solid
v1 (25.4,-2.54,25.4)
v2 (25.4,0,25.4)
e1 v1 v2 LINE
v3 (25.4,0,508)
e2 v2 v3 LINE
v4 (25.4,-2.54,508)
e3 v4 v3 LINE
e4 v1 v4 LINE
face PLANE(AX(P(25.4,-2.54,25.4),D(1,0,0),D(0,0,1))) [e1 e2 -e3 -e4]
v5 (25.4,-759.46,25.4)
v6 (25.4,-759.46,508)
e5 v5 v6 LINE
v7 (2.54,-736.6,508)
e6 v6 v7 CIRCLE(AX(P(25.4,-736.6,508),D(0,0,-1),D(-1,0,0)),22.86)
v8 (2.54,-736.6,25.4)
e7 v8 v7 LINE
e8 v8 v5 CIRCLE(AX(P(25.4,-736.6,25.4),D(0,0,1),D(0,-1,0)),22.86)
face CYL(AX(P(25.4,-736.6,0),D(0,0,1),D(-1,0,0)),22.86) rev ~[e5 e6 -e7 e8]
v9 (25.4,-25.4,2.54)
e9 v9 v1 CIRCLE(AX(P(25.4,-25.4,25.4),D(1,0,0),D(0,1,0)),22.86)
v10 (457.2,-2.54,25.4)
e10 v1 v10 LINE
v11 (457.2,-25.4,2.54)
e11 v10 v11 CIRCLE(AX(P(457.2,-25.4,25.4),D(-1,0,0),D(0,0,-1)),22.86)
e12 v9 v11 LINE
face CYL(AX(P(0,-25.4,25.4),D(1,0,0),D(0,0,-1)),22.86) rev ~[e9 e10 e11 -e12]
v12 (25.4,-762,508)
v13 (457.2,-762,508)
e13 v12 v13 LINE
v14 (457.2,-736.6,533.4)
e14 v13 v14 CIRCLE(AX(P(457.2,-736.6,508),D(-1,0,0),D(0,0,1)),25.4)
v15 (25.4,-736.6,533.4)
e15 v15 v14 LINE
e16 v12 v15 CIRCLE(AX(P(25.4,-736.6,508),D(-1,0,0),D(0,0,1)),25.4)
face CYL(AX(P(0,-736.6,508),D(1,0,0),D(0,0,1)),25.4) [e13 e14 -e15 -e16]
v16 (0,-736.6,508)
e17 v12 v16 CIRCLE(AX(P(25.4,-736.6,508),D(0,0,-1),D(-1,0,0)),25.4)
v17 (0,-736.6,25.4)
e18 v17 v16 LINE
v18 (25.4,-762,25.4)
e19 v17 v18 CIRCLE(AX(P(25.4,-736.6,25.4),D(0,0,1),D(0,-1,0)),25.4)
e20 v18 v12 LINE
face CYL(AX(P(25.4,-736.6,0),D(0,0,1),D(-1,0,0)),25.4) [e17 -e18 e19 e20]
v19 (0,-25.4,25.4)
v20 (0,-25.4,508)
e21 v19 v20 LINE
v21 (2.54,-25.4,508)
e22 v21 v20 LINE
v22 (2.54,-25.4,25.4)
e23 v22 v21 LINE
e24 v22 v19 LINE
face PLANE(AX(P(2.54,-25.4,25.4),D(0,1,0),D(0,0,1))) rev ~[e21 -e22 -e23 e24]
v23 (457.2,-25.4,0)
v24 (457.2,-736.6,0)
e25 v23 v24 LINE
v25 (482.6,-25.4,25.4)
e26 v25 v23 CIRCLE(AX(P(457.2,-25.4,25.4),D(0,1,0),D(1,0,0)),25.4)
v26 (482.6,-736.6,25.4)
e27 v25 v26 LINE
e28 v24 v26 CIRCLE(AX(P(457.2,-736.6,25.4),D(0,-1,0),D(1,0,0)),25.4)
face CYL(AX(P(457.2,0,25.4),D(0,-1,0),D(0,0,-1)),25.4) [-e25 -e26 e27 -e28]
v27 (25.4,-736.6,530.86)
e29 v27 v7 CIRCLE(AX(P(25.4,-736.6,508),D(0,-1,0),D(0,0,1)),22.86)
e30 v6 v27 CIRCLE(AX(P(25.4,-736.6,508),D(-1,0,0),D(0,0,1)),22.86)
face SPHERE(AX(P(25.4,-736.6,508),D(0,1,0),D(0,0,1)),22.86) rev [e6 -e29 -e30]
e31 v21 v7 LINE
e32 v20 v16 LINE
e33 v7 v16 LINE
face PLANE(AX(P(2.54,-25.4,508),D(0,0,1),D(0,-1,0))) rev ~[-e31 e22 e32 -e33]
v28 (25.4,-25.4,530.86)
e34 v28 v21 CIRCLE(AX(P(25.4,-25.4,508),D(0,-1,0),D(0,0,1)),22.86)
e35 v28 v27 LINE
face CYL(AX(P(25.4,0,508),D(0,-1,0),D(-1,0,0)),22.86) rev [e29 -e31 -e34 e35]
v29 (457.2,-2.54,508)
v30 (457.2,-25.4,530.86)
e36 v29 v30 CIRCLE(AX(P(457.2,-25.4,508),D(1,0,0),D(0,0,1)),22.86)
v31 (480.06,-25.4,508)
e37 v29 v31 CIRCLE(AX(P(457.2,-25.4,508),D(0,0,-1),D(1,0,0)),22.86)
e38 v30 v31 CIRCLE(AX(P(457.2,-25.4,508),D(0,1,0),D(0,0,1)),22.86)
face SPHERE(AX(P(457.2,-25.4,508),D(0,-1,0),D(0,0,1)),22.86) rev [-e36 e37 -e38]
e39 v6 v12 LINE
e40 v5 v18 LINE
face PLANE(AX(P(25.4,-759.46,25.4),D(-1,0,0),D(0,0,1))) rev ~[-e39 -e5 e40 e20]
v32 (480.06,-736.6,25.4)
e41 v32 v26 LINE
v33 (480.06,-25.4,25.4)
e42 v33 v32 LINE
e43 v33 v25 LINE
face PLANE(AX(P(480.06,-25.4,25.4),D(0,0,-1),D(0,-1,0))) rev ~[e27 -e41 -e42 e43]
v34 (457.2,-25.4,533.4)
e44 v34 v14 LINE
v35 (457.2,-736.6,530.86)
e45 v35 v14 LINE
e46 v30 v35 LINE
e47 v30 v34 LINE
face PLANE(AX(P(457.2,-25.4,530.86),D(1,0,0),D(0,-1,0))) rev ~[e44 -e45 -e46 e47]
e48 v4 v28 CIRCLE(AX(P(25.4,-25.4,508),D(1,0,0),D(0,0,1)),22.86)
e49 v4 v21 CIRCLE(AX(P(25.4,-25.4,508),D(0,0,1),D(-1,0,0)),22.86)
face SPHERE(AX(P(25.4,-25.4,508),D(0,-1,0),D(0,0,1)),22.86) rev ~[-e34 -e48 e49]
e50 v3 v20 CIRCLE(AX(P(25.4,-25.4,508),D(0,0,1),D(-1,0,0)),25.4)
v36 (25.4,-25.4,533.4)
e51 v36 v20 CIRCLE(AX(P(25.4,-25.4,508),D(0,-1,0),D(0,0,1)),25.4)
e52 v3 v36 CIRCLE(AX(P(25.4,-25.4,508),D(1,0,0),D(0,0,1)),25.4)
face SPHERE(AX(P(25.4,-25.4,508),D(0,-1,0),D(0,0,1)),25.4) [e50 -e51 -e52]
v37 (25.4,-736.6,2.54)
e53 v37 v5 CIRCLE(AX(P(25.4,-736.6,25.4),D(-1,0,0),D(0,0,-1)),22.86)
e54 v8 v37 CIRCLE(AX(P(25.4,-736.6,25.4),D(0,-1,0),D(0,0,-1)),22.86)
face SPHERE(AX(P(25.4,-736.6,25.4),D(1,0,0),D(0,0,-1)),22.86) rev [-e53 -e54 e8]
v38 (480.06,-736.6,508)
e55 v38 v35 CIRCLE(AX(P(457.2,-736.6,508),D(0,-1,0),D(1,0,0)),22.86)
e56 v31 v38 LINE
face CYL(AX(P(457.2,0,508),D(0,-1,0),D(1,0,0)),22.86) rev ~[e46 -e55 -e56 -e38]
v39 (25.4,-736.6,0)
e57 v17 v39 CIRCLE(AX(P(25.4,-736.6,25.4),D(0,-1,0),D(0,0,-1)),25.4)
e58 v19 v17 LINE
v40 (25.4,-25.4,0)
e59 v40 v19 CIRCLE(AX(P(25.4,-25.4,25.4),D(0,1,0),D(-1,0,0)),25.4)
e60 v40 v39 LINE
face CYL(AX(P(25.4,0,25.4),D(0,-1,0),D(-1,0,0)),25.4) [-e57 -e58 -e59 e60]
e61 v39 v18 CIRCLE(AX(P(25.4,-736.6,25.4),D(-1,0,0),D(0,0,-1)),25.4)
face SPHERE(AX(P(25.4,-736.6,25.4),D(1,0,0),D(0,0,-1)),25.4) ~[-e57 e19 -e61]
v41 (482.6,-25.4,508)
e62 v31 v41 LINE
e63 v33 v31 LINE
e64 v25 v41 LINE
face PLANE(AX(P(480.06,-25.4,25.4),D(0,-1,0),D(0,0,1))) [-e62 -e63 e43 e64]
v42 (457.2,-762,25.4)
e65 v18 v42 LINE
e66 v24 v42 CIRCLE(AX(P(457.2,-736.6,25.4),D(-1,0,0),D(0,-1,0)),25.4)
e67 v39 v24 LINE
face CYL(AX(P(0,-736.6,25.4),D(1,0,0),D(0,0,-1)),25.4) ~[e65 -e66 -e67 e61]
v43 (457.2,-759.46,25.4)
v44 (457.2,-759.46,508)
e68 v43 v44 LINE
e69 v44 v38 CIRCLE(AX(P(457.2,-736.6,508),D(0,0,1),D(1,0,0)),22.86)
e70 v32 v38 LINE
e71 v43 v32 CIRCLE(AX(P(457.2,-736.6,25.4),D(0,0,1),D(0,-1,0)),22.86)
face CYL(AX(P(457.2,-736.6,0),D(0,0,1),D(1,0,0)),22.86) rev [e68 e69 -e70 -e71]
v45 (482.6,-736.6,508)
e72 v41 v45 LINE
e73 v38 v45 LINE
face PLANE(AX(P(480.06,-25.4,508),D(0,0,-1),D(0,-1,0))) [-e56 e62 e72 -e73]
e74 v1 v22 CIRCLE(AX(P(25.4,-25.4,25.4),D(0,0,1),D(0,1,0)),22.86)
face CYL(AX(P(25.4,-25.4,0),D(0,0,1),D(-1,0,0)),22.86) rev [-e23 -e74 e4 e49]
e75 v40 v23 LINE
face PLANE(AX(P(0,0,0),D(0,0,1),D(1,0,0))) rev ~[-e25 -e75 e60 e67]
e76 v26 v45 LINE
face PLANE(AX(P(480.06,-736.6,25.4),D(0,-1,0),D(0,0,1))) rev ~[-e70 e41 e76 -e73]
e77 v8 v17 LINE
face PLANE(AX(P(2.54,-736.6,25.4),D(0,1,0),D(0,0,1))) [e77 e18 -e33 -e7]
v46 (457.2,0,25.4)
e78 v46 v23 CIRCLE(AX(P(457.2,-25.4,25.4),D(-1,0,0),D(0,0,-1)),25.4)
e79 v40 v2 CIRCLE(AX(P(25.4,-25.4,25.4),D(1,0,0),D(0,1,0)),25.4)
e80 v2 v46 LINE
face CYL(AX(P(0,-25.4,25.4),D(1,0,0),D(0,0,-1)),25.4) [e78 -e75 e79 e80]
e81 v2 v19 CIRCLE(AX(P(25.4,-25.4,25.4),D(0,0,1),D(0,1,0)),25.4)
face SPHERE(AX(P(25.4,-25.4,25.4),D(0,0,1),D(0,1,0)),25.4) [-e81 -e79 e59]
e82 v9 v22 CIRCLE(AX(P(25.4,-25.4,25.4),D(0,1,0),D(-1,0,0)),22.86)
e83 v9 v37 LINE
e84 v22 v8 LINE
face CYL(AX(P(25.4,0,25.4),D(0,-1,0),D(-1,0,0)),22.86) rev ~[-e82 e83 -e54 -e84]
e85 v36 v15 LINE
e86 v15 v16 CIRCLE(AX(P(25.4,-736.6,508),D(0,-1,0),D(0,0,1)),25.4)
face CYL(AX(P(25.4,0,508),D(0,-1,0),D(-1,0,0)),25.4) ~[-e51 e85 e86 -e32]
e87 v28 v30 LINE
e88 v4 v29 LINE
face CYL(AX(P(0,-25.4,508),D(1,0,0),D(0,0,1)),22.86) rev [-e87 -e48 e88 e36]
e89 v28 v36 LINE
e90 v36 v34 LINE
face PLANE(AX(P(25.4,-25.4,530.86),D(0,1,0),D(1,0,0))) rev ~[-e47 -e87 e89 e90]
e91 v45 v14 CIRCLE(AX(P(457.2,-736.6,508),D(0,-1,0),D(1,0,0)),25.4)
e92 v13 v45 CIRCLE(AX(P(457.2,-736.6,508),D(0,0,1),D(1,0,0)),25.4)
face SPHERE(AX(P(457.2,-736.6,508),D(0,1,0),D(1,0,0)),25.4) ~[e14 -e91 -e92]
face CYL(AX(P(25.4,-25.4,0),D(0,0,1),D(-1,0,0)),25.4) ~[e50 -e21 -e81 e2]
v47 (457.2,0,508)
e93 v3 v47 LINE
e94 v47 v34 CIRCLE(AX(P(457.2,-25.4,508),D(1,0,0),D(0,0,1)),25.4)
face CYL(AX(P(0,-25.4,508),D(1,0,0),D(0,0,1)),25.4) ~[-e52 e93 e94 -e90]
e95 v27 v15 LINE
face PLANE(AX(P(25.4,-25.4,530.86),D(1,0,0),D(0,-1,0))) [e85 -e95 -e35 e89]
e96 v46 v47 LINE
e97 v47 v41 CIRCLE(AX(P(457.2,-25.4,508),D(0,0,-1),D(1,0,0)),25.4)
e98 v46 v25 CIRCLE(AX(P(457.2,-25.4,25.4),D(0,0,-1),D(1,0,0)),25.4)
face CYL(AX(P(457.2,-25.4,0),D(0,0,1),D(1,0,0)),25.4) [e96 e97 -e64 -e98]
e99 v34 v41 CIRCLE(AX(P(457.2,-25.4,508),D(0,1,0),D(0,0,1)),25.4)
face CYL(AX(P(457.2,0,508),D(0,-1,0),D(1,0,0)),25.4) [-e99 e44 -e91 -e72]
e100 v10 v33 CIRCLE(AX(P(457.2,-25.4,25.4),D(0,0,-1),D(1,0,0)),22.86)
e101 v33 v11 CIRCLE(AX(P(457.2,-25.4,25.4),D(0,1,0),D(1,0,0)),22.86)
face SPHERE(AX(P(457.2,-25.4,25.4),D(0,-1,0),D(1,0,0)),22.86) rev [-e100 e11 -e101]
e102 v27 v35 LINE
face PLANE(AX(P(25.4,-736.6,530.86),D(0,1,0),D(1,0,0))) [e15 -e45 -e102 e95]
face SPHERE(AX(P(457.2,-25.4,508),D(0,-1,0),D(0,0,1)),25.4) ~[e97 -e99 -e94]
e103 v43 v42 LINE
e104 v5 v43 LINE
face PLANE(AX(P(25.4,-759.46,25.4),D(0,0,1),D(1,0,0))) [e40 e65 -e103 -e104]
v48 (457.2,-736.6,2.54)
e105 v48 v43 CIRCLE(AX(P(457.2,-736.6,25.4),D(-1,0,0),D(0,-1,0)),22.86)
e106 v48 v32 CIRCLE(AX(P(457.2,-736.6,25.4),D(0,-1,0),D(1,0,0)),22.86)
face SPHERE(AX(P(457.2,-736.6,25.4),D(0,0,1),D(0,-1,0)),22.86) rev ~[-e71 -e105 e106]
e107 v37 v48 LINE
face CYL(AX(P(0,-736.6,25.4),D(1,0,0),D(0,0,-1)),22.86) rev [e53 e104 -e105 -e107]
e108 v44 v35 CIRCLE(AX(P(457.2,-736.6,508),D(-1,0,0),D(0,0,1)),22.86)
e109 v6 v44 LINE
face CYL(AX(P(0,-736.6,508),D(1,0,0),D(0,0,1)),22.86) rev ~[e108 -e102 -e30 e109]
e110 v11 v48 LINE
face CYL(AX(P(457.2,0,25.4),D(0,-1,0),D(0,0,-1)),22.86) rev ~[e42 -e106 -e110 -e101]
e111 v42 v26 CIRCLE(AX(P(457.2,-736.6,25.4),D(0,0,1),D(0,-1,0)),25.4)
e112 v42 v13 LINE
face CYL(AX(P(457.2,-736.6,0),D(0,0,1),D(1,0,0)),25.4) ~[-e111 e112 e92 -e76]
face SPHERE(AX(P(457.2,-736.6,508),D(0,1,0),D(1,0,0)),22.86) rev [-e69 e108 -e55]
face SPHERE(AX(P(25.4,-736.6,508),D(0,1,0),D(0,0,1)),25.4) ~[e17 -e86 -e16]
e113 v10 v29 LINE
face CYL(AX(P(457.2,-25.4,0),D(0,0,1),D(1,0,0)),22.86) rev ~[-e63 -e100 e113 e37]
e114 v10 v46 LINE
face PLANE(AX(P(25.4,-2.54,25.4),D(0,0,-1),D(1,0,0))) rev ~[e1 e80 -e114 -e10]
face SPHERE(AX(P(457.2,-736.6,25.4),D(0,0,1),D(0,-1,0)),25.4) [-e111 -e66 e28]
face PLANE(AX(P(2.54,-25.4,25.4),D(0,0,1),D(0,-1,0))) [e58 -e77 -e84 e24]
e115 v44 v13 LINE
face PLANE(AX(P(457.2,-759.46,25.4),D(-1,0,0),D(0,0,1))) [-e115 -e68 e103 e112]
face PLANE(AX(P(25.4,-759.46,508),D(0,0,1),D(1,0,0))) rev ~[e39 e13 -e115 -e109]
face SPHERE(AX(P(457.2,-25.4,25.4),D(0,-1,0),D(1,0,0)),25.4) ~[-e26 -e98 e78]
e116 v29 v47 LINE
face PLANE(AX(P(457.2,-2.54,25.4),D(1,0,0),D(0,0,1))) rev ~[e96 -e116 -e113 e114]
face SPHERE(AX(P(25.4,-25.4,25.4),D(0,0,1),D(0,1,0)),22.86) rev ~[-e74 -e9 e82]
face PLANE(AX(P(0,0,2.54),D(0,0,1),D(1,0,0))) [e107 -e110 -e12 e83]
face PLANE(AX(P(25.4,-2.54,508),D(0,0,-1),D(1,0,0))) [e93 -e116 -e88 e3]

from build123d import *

# Parameters (mm, degrees)
F0_W     = 482.6
F0_H     = 533.4
F1_DEPTH = 762
F2_R     = 25.4
F3_T     = -2.54


# Not quite as in the source:
# - a shell that OpenCascade refuses in one call is made with other operations: the cavity is built on its own and cut out


with BuildPart() as f1:
    # F0 (on Front) → F1 (new body)
    with BuildSketch(Plane.XZ):
        with Locations((241.3, 266.7)):
            Rectangle(F0_W, F0_H)
    extrude(amount=F1_DEPTH)

    # F2
    f2_edges = [f1.edges().sort_by_distance(p)[0] for p in [
        (482.6, -381, 533.4),
        (482.6, -762, 266.7),
        (0, -381, 533.4),
        (241.3, 0, 533.4),
        (241.3, -762, 533.4),
        (241.3, -762, 0),
        (482.6, -381, 0),
        (482.6, 0, 266.7),
        (0, 0, 266.7),
        (241.3, 0, 0),
        (0, -381, 0),
        (0, -762, 266.7),
    ]]
    fillet(f2_edges, radius=F2_R)

    # F3: a shell. OpenCascade refuses it in one call, so the cavity is built on its own and cut out:
    # the body offset inwards by the wall thickness, plus a prism from it out through each open face.
    f3_core = offset(f1.part, amount=F3_T, mode=Mode.PRIVATE)
    f3_exits = [f3_core.faces().sort_by_distance(p)[0] for p in [
        (241.3, -2.54, 266.7),
        (241.3, -759.46, 266.7),
        (480.06, -381, 266.7),
        (241.3, -381, 530.86),
        (2.54, -381, 266.7),
    ]]
    add(f3_core, mode=Mode.SUBTRACT)
    extrude(f3_exits, amount=-F3_T, mode=Mode.SUBTRACT)


solid = f1.part
